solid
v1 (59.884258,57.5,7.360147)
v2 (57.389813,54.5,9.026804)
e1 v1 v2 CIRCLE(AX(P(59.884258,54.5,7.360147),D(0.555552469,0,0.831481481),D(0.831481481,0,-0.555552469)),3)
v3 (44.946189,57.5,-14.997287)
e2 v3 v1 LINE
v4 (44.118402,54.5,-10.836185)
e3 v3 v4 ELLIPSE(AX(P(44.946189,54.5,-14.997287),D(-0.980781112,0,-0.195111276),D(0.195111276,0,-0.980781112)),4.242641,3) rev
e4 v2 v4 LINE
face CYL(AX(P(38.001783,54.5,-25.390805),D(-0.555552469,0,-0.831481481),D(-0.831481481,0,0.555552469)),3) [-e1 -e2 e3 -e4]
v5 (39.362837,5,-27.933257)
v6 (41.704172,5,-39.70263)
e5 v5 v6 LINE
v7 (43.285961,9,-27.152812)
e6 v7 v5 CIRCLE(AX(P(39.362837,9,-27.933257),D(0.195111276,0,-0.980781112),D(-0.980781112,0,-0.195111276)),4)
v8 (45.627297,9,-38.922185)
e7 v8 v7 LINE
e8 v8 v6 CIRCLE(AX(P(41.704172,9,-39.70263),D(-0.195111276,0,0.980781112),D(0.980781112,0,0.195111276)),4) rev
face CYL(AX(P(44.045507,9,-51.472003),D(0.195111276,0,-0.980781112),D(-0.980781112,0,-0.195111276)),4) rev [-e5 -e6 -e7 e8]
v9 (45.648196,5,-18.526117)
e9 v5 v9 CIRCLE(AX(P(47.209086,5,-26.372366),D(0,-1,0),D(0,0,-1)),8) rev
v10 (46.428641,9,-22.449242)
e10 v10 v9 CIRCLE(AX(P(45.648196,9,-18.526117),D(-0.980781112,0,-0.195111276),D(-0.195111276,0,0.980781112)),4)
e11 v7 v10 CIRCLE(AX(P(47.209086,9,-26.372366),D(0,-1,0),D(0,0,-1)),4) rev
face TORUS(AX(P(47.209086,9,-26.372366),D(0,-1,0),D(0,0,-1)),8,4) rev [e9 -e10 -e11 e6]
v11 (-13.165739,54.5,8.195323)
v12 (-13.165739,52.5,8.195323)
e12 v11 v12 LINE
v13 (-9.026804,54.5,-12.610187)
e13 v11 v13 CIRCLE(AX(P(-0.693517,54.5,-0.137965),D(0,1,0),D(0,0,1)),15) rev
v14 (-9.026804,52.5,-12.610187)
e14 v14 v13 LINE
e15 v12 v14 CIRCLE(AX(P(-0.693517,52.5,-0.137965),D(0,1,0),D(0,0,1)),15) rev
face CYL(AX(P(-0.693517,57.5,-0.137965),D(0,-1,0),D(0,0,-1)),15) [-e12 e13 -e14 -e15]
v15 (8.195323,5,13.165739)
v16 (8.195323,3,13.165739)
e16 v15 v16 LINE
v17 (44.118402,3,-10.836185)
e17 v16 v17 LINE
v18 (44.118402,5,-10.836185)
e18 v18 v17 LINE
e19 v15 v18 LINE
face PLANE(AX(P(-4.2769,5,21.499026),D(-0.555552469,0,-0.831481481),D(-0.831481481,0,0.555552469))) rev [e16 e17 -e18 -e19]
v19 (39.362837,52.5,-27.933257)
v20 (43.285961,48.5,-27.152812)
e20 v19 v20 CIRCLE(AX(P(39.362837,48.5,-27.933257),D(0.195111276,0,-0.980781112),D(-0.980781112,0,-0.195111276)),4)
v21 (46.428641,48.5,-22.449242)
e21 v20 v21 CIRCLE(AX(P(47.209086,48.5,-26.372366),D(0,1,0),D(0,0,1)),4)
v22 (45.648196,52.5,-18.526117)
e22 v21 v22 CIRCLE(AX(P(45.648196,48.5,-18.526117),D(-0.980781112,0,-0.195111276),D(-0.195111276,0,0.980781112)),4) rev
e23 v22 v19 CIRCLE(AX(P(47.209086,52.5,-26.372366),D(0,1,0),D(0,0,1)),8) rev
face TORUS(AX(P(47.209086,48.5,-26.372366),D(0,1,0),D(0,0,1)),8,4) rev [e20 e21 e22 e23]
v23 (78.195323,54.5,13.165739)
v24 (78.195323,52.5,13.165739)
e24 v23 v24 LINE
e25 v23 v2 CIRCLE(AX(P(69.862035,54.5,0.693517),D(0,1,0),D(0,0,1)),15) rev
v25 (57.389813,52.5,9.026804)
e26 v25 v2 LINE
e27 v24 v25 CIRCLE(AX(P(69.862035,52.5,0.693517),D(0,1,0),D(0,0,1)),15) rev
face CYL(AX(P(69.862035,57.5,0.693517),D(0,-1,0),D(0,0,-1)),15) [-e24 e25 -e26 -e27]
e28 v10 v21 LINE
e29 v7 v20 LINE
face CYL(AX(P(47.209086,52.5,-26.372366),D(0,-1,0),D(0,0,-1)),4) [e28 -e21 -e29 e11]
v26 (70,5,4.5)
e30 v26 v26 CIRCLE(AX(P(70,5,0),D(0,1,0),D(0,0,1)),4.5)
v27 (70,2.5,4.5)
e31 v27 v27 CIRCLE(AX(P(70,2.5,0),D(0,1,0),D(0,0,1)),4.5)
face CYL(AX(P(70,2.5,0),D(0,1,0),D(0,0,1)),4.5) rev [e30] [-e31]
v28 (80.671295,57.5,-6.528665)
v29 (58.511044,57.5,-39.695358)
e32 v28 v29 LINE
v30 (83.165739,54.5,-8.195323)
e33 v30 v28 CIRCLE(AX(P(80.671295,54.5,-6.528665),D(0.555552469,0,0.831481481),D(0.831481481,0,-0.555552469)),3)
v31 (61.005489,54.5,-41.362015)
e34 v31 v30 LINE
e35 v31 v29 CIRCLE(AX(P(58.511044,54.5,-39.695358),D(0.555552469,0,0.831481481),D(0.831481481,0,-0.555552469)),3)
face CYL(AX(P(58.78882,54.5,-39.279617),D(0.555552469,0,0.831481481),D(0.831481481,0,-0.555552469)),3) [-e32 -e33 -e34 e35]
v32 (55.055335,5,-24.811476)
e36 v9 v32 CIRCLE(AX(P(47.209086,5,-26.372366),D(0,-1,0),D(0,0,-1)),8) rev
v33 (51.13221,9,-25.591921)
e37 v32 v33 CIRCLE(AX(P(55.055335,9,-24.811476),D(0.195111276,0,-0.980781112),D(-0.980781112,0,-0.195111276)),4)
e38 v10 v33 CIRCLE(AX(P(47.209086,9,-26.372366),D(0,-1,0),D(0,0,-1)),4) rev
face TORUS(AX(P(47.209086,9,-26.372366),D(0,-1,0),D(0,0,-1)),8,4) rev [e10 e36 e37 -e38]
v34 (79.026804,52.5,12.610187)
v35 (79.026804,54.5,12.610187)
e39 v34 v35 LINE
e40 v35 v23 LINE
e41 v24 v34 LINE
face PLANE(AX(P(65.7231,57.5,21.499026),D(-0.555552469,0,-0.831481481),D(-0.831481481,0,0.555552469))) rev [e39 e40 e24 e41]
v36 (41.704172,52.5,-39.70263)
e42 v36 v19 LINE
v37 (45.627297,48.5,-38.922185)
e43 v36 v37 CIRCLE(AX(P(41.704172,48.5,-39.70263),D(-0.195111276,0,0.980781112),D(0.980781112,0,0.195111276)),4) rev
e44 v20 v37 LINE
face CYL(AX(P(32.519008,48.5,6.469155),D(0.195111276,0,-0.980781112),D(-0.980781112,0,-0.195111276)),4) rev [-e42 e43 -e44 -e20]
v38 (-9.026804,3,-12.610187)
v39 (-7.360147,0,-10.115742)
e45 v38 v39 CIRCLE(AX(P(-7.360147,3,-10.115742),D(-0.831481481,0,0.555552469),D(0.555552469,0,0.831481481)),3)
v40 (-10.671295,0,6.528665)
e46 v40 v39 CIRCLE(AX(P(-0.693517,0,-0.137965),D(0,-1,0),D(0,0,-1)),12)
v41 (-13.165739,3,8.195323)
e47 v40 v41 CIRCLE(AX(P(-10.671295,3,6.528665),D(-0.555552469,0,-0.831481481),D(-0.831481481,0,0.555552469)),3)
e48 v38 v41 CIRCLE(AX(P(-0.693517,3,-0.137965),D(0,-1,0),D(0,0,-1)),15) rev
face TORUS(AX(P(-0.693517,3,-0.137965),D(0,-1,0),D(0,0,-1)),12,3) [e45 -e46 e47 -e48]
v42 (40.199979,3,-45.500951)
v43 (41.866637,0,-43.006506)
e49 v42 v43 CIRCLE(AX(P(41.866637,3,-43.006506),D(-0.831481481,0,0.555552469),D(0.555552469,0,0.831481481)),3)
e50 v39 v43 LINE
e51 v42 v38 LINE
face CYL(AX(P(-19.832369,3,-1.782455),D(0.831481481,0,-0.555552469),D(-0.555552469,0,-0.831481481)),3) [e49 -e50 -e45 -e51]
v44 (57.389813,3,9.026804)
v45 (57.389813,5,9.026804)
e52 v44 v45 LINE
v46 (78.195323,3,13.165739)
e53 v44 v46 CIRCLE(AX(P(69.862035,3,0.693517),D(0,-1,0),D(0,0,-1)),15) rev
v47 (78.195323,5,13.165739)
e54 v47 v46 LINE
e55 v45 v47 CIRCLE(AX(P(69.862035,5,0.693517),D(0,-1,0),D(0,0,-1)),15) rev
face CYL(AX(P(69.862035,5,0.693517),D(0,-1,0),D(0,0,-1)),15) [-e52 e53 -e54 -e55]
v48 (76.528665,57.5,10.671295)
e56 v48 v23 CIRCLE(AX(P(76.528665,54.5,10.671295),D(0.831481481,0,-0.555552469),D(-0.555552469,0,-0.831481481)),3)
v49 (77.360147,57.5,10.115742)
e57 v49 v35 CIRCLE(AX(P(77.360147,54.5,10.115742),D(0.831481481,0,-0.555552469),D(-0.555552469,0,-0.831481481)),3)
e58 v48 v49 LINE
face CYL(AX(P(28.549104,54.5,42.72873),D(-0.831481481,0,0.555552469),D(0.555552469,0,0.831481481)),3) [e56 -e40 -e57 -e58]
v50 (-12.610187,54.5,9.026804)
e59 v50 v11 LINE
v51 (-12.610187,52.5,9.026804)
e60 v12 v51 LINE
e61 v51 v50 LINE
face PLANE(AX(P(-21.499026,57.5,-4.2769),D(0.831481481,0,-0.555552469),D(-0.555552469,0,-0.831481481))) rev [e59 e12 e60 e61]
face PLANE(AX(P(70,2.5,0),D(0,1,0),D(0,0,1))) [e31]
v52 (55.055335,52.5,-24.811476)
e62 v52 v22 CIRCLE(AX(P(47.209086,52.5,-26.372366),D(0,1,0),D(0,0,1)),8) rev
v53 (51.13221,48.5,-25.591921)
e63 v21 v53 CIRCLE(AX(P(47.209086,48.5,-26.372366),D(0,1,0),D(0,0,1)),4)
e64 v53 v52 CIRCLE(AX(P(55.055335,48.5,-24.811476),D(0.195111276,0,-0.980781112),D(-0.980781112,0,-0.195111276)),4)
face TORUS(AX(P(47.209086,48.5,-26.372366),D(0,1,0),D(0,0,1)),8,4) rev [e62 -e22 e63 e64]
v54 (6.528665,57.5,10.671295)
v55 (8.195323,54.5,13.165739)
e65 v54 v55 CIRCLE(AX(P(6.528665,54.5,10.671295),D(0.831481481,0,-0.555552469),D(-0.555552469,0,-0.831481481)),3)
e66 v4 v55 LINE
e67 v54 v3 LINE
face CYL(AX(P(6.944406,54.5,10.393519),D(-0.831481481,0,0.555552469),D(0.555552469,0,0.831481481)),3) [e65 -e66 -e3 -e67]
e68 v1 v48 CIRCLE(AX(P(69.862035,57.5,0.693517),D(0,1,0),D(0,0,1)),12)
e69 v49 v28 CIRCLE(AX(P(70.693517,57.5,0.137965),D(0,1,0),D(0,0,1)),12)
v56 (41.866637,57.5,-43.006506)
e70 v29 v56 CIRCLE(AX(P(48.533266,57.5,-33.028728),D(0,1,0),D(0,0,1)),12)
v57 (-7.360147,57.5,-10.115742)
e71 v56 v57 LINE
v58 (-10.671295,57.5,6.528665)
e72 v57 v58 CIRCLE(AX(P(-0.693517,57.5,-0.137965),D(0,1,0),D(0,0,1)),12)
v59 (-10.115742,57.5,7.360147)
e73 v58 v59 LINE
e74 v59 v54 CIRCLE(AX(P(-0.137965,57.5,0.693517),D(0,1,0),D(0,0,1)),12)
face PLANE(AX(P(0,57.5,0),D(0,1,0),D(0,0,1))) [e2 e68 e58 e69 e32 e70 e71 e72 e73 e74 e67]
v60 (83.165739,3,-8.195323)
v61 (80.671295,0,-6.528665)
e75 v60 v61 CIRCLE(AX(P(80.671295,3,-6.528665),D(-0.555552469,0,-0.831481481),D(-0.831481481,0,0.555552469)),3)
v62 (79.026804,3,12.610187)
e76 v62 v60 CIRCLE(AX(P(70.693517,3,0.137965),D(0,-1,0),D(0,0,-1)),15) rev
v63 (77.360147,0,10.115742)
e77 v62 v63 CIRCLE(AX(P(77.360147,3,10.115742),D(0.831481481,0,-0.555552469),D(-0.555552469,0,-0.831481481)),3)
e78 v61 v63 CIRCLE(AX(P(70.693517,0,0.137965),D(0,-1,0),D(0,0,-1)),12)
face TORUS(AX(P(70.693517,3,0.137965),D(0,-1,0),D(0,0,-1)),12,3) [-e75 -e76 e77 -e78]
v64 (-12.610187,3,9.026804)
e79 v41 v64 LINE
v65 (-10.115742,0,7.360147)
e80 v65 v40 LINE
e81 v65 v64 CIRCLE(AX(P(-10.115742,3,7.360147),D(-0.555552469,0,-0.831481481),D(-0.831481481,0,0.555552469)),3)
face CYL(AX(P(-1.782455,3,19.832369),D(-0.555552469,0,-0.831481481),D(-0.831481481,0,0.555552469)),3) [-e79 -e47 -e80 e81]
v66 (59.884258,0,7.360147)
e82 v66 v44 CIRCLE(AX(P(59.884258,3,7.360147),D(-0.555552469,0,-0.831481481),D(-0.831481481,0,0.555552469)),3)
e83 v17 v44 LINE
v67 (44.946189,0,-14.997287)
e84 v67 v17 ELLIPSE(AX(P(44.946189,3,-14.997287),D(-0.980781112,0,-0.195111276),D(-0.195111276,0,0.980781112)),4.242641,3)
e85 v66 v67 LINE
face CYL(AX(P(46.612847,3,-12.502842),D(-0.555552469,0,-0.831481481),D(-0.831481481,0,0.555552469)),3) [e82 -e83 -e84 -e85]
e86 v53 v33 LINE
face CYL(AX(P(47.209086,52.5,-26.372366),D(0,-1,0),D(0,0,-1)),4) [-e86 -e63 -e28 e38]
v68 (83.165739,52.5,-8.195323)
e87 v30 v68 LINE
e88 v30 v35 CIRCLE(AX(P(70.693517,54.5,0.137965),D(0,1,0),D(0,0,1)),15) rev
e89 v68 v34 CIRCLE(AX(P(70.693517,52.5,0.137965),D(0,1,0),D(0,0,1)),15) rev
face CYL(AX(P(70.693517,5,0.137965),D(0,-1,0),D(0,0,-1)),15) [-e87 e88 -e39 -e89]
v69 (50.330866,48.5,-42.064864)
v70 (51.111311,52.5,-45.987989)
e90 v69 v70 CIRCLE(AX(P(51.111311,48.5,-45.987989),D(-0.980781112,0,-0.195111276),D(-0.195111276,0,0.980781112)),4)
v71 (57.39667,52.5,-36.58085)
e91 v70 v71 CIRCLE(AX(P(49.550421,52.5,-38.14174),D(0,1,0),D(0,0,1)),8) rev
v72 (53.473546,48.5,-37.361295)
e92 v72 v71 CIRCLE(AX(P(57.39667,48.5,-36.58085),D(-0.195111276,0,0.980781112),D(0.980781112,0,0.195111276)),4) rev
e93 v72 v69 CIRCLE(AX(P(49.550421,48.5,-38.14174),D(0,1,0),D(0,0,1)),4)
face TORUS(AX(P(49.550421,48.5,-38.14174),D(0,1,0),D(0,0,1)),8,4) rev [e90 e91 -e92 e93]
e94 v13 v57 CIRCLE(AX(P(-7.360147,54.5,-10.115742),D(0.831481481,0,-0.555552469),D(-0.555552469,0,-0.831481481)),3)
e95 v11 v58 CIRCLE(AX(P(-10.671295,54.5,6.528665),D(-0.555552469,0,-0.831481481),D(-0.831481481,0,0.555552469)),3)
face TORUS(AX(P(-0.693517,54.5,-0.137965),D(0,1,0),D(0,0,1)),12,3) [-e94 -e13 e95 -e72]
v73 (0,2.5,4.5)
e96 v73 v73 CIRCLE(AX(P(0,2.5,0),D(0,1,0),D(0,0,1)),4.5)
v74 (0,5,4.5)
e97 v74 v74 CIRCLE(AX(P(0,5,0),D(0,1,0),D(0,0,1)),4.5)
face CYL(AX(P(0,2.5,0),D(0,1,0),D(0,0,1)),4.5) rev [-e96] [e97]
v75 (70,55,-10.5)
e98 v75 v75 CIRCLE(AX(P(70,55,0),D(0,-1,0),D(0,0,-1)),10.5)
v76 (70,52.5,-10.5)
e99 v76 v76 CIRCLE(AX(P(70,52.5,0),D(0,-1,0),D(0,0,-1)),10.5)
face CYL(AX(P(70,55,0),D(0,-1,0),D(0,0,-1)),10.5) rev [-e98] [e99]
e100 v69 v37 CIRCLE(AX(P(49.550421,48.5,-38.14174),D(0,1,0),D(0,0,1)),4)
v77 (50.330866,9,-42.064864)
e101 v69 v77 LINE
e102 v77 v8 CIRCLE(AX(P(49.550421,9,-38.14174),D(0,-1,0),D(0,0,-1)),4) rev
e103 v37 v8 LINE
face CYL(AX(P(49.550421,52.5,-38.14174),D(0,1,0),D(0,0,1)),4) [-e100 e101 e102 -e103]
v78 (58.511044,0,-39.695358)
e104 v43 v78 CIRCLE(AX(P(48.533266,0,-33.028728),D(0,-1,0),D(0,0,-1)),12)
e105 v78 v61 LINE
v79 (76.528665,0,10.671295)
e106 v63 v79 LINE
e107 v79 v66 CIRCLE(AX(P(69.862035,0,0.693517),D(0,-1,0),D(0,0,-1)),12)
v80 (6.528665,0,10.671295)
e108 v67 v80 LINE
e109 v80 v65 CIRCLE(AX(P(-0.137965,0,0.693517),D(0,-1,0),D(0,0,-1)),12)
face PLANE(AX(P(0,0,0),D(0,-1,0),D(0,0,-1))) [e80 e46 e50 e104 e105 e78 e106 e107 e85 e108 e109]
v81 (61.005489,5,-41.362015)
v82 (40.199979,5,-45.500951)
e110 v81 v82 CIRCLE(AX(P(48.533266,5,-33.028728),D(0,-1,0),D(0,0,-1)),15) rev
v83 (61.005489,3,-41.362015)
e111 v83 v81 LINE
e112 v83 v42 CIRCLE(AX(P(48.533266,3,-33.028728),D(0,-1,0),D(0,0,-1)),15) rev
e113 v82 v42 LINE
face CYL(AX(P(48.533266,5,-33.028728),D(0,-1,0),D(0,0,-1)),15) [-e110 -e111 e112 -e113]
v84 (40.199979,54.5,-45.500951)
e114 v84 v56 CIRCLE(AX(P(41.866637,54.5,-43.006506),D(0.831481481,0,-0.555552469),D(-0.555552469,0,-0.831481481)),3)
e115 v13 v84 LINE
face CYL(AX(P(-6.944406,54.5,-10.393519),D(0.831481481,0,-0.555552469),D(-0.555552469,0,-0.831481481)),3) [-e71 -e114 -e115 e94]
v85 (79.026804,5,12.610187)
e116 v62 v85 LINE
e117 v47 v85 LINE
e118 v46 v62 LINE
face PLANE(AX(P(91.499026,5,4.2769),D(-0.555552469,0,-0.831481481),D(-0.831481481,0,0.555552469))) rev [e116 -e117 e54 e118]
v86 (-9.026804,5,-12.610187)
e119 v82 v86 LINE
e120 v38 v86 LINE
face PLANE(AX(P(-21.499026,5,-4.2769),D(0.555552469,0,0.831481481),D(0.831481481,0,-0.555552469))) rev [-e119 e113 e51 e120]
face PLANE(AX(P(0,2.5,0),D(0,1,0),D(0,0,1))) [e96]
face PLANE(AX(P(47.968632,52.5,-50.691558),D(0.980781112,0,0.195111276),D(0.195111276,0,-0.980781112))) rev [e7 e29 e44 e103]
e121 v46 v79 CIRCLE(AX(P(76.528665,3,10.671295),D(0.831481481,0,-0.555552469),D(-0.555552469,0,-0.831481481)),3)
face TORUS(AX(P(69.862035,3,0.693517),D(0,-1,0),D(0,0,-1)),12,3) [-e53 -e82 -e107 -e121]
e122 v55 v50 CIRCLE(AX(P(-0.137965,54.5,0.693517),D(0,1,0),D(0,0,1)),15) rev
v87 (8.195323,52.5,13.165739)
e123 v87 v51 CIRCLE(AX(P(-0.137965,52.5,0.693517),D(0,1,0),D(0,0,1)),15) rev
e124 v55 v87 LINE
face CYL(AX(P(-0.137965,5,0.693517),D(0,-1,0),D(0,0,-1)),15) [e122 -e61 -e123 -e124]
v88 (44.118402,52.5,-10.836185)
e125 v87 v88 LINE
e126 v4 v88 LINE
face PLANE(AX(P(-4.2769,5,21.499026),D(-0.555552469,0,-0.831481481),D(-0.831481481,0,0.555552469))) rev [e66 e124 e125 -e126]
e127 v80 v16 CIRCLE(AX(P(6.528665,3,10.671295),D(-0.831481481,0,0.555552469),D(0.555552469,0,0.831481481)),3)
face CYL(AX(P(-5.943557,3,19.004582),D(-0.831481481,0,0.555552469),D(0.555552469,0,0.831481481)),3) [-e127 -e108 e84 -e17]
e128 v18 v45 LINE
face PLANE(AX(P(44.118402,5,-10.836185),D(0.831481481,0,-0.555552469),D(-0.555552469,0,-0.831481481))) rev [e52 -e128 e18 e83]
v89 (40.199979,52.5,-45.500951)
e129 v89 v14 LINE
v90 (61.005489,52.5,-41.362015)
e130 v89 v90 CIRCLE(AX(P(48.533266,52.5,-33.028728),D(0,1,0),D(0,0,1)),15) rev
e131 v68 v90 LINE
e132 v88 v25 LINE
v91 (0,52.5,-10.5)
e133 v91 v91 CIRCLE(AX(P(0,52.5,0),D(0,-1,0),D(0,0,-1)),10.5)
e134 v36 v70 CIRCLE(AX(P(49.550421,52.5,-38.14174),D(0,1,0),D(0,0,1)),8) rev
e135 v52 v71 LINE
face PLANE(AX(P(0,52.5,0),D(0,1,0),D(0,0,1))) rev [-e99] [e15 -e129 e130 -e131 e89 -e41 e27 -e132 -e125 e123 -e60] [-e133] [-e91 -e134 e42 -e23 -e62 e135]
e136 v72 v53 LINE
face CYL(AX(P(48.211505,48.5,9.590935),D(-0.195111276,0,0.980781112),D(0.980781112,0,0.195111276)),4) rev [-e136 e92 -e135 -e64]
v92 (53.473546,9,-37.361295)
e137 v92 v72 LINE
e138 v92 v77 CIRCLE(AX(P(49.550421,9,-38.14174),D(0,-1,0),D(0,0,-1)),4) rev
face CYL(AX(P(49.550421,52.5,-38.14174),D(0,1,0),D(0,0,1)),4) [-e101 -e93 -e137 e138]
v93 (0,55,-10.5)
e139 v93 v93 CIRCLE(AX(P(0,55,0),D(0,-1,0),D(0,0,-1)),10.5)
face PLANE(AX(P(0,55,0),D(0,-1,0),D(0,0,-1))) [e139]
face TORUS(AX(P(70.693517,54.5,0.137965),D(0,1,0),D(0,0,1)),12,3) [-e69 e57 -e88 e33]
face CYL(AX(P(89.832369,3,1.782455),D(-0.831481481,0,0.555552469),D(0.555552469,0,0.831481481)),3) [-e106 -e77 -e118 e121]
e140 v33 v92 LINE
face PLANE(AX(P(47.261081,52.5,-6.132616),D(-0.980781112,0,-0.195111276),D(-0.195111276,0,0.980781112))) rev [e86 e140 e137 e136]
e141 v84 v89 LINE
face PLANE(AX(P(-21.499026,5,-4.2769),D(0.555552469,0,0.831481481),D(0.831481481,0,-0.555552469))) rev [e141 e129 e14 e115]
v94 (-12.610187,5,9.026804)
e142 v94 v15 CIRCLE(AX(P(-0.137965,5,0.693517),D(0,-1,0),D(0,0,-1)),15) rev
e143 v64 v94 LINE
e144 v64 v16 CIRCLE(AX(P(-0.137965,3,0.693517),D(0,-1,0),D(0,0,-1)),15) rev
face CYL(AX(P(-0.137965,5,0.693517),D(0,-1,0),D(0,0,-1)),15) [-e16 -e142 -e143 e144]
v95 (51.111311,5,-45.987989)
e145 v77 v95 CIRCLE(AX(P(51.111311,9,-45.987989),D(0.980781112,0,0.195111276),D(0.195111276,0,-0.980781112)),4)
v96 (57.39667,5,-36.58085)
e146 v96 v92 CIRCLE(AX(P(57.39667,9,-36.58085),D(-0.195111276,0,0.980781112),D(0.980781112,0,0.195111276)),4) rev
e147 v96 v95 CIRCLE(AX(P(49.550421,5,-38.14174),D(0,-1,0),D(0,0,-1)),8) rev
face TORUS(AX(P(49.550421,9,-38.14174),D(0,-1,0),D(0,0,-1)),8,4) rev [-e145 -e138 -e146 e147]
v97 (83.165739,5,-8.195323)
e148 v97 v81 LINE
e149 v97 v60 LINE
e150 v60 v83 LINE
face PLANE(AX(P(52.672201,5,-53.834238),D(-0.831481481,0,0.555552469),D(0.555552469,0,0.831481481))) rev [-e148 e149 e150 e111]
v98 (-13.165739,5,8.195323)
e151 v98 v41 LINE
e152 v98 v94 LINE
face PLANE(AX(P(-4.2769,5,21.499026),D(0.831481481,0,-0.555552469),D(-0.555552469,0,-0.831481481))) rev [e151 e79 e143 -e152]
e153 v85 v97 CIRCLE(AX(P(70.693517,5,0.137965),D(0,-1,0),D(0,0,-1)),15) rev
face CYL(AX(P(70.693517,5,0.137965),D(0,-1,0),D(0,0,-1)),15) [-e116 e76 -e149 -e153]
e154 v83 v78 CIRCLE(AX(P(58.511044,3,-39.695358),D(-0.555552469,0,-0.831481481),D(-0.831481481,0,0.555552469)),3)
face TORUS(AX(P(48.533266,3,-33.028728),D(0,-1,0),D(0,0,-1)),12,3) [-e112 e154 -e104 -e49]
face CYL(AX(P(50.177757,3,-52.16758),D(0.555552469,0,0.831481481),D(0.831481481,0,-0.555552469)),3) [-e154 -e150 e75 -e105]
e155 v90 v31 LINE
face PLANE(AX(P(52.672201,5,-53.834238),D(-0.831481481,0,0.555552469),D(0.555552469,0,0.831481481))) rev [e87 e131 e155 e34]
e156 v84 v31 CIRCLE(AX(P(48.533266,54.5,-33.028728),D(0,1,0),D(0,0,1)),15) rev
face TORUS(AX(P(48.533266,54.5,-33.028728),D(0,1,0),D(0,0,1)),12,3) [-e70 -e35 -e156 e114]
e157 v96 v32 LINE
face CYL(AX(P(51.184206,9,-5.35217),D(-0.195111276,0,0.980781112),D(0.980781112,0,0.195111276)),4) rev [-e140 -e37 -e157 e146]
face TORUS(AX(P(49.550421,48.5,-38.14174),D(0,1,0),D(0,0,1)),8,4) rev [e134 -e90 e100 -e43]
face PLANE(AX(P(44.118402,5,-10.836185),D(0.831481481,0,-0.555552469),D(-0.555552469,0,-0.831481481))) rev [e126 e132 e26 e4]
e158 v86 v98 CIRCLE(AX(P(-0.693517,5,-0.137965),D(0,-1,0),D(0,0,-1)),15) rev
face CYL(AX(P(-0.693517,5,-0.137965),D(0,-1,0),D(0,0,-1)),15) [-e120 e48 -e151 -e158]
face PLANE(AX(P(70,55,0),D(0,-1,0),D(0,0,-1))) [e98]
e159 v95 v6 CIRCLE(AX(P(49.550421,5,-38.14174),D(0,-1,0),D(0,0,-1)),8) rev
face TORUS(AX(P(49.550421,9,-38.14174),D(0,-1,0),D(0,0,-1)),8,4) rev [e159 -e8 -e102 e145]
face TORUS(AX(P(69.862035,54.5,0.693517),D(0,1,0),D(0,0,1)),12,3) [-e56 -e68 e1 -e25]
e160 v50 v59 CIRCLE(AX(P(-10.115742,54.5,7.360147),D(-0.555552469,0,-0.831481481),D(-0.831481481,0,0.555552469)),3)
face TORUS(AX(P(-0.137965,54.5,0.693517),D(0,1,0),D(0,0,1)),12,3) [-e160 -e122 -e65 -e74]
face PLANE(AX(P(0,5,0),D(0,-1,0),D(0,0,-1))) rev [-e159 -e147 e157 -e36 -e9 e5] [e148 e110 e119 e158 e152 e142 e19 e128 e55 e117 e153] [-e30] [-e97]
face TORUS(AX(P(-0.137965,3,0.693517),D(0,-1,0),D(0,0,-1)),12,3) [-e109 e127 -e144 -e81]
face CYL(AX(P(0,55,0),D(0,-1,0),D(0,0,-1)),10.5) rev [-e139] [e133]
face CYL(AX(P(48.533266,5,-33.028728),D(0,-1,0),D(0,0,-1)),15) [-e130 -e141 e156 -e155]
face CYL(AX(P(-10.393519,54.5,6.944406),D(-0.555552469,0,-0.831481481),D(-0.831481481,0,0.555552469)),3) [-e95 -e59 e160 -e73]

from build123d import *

# Parameters (mm, degrees)
SALIENTE_EXTRUIR2_DEPTH = 5
CROQUIS2_R              = 4.5
CORTAR_EXTRUIR1_DEPTH   = 2.5
SALIENTE_EXTRUIR3_DEPTH = 47.5
SALIENTE_EXTRUIR4_DEPTH = 5
CROQUIS6_R              = 10.5
CORTAR_EXTRUIR2_DEPTH   = 2.5
CROQUIS7_W              = 26.576799325
CROQUIS7_H              = 47.5
CROQUIS7_W_2            = 20
CORTAR_EXTRUIR3_DEPTH   = 12.5
REDONDEO1_R             = 15
REDONDEO2_R             = 3
REDONDEO3_R             = 4


with BuildPart() as part:
    # Croquis1 → Saliente-Extruir2 (new body)
    with BuildSketch(Plane(origin=(0, 0, 0), x_dir=(1, 0, 0), z_dir=(0, 1, 0))):
        Polygon((-4.276899691, -21.499026234), (-21.499026234, 4.276899691), (40.72350463, 45.850742798), (52.672201475, 53.834237539), (91.499026234, -4.276899691), (65.723100309, -21.499026234), (44.118402092, 10.836185071), align=None)
    extrude(amount=SALIENTE_EXTRUIR2_DEPTH)

    # Croquis2 → Cortar-Extruir1 (cut)
    with BuildSketch(Plane(origin=(0, 5, 0), x_dir=(1, 0, 0), z_dir=(0, 1, 0))):
        with Locations(Location((0, 0, 0), (0, 0, 270))):
            Circle(CROQUIS2_R)
        with Locations(Location((70, 0, 0), (0, 0, 270))):
            Circle(CROQUIS2_R)
    extrude(amount=-CORTAR_EXTRUIR1_DEPTH, mode=Mode.SUBTRACT)

    # Croquis4 → Saliente-Extruir3 (add)
    with BuildSketch(Plane(origin=(0, 5, 0), x_dir=(1, 0, 0), z_dir=(0, 1, 0))):
        Polygon((52.672201475, 53.834237539), (47.968631923, 50.691558194), (39.41483254, 7.693505725), (44.118402092, 10.836185071), (47.261081438, 6.132615519), (55.814880821, 49.130667987), align=None)
    extrude(amount=SALIENTE_EXTRUIR3_DEPTH)

    # Croquis5 → Saliente-Extruir4 (add)
    with BuildSketch(Plane(origin=(0, 52.5, 0), x_dir=(1, 0, 0), z_dir=(0, 1, 0))):
        Polygon((-21.499026234, 4.276899691), (-4.276899691, -21.499026234), (44.118402092, 10.836185071), (65.723100309, -21.499026234), (91.499026234, -4.276899691), (52.672201475, 53.834237539), align=None)
    extrude(amount=SALIENTE_EXTRUIR4_DEPTH)

    # Croquis6 → Cortar-Extruir2 (cut)
    with BuildSketch(Plane.XZ.offset(-52.5)):
        with Locations(Location((0, 0, 0), (0, 0, 270))):
            Circle(CROQUIS6_R)
        with Locations(Location((70, 0, 0), (0, 0, 270))):
            Circle(CROQUIS6_R)
    extrude(amount=-CORTAR_EXTRUIR2_DEPTH, mode=Mode.SUBTRACT)

    # Croquis7 → Cortar-Extruir3 (cut)
    with BuildSketch(Plane(origin=(36.442132095, 0, 7.249600136), x_dir=(-0.19511127576179904, 0, 0.9807811122113861), z_dir=(-0.9807811122113861, 0, -0.19511127576179904))):
        with Locations((-64.364943459, 28.75)):
            Rectangle(CROQUIS7_W, CROQUIS7_H)
        with Locations((-21.076543796, 28.75)):
            Rectangle(CROQUIS7_W_2, CROQUIS7_H)
    extrude(amount=-CORTAR_EXTRUIR3_DEPTH, mode=Mode.SUBTRACT)

    # Redondeo1
    redondeo1_edges = [part.edges().sort_by_distance(p)[0] for p in [
        (-4.276899691, 2.5, 21.499026234),
        (-21.499026234, 2.5, -4.276899691),
        (52.672201475, 55, -53.834237539),
        (91.499026234, 2.5, 4.276899691),
        (65.723100309, 2.5, 21.499026234),
        (-21.499026234, 55, -4.276899691),
        (-4.276899691, 55, 21.499026234),
        (65.723100309, 55, 21.499026234),
        (91.499026234, 55, 4.276899691),
        (52.672201475, 2.5, -53.834237539),
    ]]
    fillet(redondeo1_edges, radius=REDONDEO1_R)

    # Redondeo2
    redondeo2_edges = [part.edges().sort_by_distance(p)[0] for p in [
        (50.754107682, 0, -0.904690529),
        (15.58658762, 0, -29.055568615),
        (26.156862311, 0, 1.164777064),
        (-12.887962963, 0, 8.611063271),
        (72.085613855, 0, -24.778668924),
        (78.611063271, 0, 12.887962963),
        (85.405233658, 0, 3.064633643),
        (66.935366357, 0, 15.405233658),
        (-3.064633643, 0, 15.405233658),
        (-15.405233658, 0, -3.064633643),
        (51.459935426, 0, -47.740444963),
        (15.58658762, 57.5, -29.055568615),
        (72.085613855, 57.5, -24.778668924),
        (-12.887962963, 57.5, 8.611063271),
        (26.156862311, 57.5, 1.164777064),
        (78.611063271, 57.5, 12.887962963),
        (-15.405233658, 57.5, -3.064633643),
        (-3.064633643, 57.5, 15.405233658),
        (66.935366357, 57.5, 15.405233658),
        (85.405233658, 57.5, 3.064633643),
        (51.459935426, 57.5, -47.740444963),
        (50.754107682, 57.5, -0.904690529),
    ]]
    fillet(redondeo2_edges, radius=REDONDEO2_R)

    # Redondeo3
    redondeo3_edges = [part.edges().sort_by_distance(p)[0] for p in [
        (46.42864065, 52.5, -22.449241949),
        (42.505516202, 28.75, -23.229687052),
        (50.351765099, 28.75, -21.668796846),
        (46.42864065, 5, -22.449241949),
        (52.302877857, 52.5, -31.476607968),
        (44.456628959, 52.5, -33.037498174),
        (52.302877857, 5, -31.476607968),
        (44.456628959, 5, -33.037498174),
        (50.330866166, 5, -42.064864193),
        (46.407741717, 28.75, -42.845309296),
        (54.253990614, 28.75, -41.28441909),
        (50.330866166, 52.5, -42.064864193),
    ]]
    fillet(redondeo3_edges, radius=REDONDEO3_R - 0.0001)  # a hair under: the kernel refuses the full size


solid = part.part
